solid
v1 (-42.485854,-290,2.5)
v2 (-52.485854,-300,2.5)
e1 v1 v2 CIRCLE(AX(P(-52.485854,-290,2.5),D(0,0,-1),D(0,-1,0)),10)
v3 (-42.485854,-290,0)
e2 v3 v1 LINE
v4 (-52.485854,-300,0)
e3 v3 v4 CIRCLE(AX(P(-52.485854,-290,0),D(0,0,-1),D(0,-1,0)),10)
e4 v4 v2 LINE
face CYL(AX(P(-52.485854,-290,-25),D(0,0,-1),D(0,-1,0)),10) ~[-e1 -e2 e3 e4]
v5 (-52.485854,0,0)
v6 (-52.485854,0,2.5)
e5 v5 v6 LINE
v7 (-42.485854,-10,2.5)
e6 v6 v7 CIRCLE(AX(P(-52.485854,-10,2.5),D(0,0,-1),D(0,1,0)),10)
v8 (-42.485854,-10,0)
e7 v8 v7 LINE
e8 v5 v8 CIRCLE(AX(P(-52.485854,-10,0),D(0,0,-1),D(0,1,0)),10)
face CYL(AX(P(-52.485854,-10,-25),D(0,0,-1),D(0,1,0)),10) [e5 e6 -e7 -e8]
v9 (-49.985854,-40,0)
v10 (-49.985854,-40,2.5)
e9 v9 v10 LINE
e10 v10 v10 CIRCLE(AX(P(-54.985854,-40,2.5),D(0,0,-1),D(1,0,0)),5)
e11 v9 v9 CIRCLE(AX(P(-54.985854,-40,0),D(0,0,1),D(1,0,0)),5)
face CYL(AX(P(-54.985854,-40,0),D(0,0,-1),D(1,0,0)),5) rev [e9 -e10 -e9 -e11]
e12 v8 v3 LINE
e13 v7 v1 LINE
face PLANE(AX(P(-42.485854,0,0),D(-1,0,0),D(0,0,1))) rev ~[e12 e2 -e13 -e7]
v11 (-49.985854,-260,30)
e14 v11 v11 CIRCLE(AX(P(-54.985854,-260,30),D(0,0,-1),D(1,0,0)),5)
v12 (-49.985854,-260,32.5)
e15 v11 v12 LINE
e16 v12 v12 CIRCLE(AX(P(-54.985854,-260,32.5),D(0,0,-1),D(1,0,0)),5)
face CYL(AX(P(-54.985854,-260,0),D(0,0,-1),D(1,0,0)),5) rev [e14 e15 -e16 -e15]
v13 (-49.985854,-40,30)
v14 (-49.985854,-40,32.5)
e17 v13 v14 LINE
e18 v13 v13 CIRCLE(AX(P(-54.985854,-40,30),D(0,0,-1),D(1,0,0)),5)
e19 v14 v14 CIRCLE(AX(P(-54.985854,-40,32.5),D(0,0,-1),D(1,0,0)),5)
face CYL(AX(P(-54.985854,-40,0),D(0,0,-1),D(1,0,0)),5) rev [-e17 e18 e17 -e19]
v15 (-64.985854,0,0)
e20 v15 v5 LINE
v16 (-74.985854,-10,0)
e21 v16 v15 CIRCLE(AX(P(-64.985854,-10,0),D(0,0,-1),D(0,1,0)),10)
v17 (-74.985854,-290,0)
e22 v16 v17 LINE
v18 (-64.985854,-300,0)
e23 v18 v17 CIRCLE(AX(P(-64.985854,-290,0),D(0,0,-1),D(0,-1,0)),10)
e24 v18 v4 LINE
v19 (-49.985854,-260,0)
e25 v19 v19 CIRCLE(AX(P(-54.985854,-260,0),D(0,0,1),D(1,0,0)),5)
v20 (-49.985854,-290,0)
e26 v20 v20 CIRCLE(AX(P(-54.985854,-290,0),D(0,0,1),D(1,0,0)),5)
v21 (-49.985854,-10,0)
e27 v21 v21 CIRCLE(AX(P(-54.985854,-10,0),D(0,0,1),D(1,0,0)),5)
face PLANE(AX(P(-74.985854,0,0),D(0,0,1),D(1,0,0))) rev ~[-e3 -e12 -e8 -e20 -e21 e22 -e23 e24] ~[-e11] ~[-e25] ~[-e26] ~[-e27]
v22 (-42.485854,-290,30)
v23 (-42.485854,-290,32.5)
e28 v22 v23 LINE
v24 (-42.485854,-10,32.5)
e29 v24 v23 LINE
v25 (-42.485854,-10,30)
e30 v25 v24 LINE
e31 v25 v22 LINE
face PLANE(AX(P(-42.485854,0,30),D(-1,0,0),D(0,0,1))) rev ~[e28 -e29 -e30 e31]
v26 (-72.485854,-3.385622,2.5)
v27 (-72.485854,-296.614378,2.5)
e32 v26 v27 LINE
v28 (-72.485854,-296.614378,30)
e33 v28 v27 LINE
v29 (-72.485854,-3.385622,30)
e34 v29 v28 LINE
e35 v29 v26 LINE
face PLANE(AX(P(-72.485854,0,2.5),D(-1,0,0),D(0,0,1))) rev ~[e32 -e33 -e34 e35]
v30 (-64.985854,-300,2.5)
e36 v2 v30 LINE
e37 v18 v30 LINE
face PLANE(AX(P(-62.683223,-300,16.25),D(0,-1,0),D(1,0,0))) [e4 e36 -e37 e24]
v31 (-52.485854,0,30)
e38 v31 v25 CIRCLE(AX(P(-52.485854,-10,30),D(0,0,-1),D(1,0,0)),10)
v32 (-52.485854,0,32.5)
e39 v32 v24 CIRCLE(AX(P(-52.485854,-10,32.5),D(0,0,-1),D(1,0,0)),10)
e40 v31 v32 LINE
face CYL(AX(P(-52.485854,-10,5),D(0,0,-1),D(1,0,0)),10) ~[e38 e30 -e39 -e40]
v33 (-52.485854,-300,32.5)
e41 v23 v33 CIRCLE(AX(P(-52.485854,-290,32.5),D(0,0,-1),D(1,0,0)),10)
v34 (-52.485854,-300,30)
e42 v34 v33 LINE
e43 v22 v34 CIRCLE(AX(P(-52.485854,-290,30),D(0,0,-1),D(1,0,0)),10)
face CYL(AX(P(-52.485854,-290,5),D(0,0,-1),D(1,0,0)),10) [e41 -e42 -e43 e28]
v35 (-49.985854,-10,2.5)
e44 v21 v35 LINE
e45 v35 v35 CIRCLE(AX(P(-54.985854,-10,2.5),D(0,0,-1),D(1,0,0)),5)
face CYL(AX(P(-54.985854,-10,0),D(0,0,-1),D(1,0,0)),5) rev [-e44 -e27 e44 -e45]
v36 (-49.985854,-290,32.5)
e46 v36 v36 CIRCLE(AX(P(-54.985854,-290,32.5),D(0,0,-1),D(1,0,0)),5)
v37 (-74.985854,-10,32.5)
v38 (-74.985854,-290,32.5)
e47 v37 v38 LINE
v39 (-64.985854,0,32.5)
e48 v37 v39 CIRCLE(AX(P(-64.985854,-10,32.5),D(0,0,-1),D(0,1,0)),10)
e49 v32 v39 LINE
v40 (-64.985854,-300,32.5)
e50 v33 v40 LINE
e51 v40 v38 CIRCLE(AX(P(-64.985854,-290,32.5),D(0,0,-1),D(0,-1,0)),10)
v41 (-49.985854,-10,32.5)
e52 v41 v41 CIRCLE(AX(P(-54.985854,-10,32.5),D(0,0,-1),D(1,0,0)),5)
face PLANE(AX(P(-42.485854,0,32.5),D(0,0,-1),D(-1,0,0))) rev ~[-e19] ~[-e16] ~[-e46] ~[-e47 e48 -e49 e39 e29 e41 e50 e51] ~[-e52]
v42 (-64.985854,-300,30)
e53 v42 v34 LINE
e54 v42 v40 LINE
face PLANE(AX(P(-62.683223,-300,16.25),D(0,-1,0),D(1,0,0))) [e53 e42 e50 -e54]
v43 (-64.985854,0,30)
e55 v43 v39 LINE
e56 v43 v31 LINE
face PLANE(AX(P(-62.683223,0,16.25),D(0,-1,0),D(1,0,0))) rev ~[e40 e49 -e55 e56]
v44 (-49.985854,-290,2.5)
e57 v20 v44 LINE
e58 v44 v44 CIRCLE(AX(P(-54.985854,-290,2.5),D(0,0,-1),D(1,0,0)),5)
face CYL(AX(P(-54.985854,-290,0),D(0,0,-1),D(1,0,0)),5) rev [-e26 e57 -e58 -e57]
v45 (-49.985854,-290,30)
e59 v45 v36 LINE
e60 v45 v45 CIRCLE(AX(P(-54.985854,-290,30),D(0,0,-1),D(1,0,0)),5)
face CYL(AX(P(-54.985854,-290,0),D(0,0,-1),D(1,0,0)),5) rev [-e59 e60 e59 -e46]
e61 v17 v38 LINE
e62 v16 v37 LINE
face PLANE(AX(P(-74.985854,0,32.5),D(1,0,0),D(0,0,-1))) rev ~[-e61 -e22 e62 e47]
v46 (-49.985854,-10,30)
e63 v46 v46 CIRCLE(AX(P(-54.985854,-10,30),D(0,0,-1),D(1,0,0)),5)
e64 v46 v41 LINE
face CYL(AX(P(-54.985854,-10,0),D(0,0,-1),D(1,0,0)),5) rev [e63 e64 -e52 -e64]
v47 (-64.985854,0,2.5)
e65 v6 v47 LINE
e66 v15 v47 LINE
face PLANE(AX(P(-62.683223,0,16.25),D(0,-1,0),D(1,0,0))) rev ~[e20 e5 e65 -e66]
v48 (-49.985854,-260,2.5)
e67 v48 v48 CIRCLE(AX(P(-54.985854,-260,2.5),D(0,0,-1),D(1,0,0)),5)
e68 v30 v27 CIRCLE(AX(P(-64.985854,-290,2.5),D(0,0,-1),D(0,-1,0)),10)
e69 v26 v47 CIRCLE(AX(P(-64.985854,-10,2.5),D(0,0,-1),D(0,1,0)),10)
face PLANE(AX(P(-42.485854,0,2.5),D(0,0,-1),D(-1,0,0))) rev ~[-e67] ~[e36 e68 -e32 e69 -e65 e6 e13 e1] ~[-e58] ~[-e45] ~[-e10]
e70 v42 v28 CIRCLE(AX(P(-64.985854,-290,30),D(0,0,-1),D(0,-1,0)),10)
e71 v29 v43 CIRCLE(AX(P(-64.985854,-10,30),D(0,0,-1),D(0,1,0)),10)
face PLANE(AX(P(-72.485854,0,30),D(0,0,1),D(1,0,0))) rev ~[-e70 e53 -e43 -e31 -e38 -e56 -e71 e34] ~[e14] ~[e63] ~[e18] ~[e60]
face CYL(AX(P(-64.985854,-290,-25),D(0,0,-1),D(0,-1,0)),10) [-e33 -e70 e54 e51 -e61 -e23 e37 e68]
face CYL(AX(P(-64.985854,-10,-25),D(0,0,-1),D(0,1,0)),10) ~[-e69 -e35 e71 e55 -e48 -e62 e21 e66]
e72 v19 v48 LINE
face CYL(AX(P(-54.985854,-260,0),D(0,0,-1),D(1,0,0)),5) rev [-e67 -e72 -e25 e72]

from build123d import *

# Parameters (mm, degrees)
F2_DEPTH    = 300
F1_R        = 5
F3_DEPTH    = 46
F4_T1_DEPTH = 52.5
F4_T3_DEPTH = 52.5
F4_T5_DEPTH = 82.5


# Not quite as in the source:
# - a fillet or chamfer that OpenCascade refuses, or shapes differently, is made with other operations: its cross-section is extruded or revolved along the edge and cut away or added


with BuildPart() as f2:
    # F0 (on Front) → F2 (new body)
    with BuildSketch(Plane.XZ):
        Polygon((-74.9858543277, 32.5), (-74.9858543277, 0), (-42.4858543277, 0), (-42.4858543277, 2.5), (-72.4858543277, 2.5), (-72.4858543277, 30), (-42.4858543277, 30), (-42.4858543277, 32.5), align=None)
    extrude(amount=F2_DEPTH)

    # F1 (on Top) → F3 (cut)
    with BuildSketch(Plane.XY):
        with BuildLine():
            ThreePointArc((-59.9858543277, -290), (-54.9858543277, -295), (-49.9858543277, -290))
            ThreePointArc((-49.9858543277, -290), (-54.9858543277, -285), (-59.9858543277, -290))
        make_face()
        with Locations((-54.9858543277, -260)):
            Circle(F1_R)
        with Locations((-54.9858543277, -40)):
            Circle(F1_R)
        with Locations((-54.9858543277, -10)):
            Circle(F1_R)
    extrude(amount=F3_DEPTH, mode=Mode.SUBTRACT)

    # F4: fillet of radius 10 on 6 edges, made by hand

    # F4_s2 → F4_t1 (cut)
    with BuildSketch(Plane.XY.offset(-25)):
        with BuildLine():
            ThreePointArc((-52.4858543277, 0), (-45.4147865158, -2.9289321881), (-42.4858543277, -10))
            Line((-42.4858543277, -10), (-42.4858543277, 0))
            Line((-42.4858543277, 0), (-52.4858543277, 0))
        make_face()
        with BuildLine():
            ThreePointArc((-52.4858543277, -300), (-45.4147865158, -297.0710678119), (-42.4858543277, -290))
            Line((-42.4858543277, -290), (-42.4858543277, -300))
            Line((-42.4858543277, -300), (-52.4858543277, -300))
        make_face()
    extrude(amount=F4_T1_DEPTH, mode=Mode.SUBTRACT)

    # F4_s4 → F4_t3 (cut)
    with BuildSketch(Plane.XY.offset(5)):
        with BuildLine():
            ThreePointArc((-42.4858543277, -10), (-45.4147865158, -2.9289321881), (-52.4858543277, 0))
            Line((-52.4858543277, 0), (-42.4858543277, 0))
            Line((-42.4858543277, 0), (-42.4858543277, -10))
        make_face()
        with BuildLine():
            ThreePointArc((-42.4858543277, -290), (-45.4147865158, -297.0710678119), (-52.4858543277, -300))
            Line((-52.4858543277, -300), (-42.4858543277, -300))
            Line((-42.4858543277, -300), (-42.4858543277, -290))
        make_face()
    extrude(amount=F4_T3_DEPTH, mode=Mode.SUBTRACT)

    # F4_s6 → F4_t5 (cut)
    with BuildSketch(Plane.XY.offset(-25)):
        with BuildLine():
            ThreePointArc((-64.9858543277, 0), (-72.0569221395, -2.9289321881), (-74.9858543277, -10))
            Line((-74.9858543277, -10), (-74.9858543277, 0))
            Line((-74.9858543277, 0), (-64.9858543277, 0))
        make_face()
        with BuildLine():
            ThreePointArc((-64.9858543277, -300), (-72.0569221395, -297.0710678119), (-74.9858543277, -290))
            Line((-74.9858543277, -290), (-74.9858543277, -300))
            Line((-74.9858543277, -300), (-64.9858543277, -300))
        make_face()
    extrude(amount=F4_T5_DEPTH, mode=Mode.SUBTRACT)


solid = f2.part
